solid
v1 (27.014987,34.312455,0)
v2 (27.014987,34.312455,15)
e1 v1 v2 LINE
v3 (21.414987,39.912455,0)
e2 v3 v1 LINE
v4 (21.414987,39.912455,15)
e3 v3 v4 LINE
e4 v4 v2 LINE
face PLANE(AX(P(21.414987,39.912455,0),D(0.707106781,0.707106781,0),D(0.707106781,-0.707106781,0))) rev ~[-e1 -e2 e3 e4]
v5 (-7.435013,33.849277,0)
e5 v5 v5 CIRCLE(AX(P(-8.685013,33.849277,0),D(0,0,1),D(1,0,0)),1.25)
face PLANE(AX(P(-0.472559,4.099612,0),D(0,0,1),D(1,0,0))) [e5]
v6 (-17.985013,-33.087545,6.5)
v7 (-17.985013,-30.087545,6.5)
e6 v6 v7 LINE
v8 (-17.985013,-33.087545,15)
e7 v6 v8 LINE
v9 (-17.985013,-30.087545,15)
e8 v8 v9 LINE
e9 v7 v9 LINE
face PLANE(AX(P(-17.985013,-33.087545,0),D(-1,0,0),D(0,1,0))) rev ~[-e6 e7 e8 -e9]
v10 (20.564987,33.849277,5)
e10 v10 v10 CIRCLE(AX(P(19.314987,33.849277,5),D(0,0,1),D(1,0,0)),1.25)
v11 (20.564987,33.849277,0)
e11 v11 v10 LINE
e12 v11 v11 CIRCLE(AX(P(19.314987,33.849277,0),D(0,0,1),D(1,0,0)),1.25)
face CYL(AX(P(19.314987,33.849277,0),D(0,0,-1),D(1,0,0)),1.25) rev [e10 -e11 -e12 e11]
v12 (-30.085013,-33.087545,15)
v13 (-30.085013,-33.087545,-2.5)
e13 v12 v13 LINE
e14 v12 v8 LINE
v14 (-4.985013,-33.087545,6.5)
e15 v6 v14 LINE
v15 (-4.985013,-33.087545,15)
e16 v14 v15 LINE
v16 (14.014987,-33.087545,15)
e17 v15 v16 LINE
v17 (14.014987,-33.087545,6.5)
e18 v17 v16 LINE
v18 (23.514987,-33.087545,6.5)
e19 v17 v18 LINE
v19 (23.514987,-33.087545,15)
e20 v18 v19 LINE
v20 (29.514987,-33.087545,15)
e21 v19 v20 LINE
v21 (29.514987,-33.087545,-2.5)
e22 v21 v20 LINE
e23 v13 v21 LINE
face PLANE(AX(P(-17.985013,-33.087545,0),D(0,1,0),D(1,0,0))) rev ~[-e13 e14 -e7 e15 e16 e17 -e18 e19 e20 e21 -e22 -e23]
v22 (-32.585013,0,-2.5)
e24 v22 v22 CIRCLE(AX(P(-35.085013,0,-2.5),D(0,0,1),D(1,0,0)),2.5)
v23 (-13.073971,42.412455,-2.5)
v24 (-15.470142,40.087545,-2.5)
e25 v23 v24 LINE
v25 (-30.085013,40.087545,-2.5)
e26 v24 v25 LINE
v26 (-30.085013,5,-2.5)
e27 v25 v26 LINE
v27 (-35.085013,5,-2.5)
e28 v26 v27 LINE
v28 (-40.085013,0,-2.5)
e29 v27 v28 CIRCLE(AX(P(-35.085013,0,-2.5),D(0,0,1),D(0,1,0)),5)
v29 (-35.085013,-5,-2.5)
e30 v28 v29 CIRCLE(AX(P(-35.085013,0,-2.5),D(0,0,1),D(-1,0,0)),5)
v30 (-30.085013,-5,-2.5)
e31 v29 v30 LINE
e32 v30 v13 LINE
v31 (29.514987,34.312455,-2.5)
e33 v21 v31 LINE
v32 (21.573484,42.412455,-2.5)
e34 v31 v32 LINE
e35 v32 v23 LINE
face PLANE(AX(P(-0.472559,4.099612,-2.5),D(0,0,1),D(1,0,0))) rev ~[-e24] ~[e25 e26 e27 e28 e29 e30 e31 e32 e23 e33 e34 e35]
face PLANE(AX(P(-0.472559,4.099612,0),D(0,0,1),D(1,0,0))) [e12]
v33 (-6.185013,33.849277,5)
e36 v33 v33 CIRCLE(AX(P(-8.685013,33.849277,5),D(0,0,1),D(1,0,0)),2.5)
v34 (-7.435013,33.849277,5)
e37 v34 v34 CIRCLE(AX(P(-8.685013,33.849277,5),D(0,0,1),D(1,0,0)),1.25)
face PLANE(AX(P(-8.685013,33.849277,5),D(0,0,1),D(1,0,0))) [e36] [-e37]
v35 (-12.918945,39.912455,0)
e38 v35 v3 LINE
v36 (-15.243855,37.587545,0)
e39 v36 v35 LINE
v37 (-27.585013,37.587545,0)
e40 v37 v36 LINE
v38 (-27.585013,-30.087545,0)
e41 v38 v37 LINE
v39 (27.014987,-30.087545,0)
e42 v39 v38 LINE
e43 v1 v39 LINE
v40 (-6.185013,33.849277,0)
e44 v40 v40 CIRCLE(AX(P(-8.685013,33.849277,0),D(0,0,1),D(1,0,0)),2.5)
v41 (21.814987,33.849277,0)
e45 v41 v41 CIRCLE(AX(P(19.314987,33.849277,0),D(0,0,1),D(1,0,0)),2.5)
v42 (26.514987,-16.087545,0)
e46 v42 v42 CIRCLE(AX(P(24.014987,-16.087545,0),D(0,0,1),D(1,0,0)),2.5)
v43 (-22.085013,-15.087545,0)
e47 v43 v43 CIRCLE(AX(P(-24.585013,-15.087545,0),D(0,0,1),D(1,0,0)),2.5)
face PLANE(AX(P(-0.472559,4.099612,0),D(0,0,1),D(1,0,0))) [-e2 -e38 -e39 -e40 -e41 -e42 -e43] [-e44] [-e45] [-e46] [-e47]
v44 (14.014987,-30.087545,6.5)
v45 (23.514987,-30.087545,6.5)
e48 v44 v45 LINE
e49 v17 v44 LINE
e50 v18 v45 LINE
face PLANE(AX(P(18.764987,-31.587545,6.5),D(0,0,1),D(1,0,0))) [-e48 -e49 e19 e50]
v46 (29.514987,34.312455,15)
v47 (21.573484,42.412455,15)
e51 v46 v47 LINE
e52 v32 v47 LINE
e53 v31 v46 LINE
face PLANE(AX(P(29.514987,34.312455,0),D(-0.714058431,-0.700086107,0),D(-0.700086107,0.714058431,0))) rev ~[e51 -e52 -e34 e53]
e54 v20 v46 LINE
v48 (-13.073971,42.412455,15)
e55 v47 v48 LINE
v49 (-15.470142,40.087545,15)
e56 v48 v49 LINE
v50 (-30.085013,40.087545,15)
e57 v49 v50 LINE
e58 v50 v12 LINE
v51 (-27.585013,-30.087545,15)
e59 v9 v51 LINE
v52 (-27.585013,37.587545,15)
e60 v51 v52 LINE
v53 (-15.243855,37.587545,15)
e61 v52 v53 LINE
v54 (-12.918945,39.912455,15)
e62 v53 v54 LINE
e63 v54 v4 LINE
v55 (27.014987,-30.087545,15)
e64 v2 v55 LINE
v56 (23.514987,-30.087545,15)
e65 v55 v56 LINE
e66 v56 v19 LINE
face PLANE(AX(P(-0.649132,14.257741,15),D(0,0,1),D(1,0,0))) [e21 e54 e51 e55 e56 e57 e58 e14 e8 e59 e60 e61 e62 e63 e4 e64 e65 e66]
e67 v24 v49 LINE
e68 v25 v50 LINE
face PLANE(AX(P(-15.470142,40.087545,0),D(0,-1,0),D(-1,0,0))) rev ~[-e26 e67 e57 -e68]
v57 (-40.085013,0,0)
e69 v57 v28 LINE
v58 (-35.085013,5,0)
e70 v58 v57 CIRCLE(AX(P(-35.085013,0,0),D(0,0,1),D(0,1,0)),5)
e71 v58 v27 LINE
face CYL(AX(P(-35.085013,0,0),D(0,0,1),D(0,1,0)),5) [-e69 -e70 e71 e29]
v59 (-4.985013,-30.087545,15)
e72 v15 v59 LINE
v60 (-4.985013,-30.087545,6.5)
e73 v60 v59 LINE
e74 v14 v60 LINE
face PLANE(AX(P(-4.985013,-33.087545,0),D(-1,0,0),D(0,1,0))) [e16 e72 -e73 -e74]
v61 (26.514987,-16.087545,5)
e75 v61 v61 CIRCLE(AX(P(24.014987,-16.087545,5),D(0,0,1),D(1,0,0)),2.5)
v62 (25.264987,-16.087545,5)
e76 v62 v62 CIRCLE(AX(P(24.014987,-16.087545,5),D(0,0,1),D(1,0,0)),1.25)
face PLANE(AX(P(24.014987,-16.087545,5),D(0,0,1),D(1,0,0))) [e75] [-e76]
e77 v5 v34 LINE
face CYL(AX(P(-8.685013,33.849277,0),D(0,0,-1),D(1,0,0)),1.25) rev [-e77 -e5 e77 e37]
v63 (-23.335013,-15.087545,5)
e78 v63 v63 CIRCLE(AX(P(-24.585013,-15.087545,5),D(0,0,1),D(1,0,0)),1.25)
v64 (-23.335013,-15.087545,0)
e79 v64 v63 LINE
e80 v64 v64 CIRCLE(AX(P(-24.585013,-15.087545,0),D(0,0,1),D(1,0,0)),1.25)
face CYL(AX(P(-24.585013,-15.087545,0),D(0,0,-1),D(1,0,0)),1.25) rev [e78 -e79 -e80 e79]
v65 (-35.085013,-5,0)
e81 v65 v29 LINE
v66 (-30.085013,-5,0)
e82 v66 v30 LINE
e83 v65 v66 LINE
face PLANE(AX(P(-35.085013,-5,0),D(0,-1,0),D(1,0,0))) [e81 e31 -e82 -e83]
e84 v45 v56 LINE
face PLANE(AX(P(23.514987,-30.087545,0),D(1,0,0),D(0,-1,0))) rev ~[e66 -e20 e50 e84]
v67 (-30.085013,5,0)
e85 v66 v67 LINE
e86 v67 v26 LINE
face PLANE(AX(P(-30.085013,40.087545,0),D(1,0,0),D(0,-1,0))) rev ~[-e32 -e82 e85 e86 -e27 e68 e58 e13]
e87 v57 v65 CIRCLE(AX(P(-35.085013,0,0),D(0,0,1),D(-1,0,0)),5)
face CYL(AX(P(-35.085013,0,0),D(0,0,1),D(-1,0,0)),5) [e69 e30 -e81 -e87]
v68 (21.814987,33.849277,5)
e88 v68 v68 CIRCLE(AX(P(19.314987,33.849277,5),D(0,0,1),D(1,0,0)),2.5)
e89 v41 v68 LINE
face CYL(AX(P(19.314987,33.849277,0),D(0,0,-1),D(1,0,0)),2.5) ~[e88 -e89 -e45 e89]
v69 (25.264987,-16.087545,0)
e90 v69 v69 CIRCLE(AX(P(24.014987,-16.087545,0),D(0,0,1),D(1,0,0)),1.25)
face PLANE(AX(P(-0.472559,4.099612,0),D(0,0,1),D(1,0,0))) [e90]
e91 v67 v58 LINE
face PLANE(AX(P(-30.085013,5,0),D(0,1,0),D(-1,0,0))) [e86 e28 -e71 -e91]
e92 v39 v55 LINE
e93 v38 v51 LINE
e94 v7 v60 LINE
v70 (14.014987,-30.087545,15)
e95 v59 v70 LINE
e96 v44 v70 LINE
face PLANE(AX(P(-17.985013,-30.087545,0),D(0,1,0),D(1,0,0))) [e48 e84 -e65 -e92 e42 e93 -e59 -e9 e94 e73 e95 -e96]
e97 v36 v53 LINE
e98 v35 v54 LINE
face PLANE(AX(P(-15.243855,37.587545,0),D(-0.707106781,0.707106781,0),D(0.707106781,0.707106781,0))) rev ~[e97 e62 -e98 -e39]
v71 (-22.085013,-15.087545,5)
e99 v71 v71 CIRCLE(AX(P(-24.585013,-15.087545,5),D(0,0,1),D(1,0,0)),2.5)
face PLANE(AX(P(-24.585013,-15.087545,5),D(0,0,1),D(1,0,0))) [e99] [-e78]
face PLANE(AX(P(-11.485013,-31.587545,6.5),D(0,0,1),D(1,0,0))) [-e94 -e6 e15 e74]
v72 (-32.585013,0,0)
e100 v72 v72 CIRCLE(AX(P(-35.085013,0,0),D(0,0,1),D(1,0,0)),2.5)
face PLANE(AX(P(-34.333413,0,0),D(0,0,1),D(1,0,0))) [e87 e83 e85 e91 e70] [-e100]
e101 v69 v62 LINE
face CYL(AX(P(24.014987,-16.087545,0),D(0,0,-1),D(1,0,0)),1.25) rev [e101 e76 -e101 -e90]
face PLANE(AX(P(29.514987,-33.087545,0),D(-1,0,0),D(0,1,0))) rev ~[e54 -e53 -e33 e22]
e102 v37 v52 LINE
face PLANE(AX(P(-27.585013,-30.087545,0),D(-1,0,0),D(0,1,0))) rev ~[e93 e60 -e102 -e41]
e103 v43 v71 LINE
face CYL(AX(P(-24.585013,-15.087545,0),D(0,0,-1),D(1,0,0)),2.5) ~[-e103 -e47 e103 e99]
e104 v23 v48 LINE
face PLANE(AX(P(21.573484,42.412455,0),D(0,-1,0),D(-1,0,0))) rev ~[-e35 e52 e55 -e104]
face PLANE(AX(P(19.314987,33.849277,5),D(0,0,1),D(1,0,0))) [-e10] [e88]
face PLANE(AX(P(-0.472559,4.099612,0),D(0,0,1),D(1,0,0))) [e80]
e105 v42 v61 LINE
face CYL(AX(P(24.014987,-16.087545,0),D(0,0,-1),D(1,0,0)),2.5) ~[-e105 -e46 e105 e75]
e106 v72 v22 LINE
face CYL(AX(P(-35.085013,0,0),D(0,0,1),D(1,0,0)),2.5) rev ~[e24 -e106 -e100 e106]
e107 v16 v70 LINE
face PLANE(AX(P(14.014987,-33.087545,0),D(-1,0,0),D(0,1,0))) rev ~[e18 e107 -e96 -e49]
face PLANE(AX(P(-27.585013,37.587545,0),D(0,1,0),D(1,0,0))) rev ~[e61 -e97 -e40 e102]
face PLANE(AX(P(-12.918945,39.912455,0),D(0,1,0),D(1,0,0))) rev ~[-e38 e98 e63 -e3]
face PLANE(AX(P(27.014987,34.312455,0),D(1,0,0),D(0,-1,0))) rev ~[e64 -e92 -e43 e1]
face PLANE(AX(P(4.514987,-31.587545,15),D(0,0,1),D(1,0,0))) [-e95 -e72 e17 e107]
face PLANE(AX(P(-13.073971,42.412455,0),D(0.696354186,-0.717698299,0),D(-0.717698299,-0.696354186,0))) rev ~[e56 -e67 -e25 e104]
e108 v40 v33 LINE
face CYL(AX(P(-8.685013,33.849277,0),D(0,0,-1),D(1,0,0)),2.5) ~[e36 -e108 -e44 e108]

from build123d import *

# Parameters (mm, degrees)
F0_R     = 2.5
F0_W     = 19
F0_H     = 3
F0_W_2   = 13
F0_W_3   = 9.5
F0_R_2   = 1.25
F1_DEPTH = 2.5
F2_DEPTH = 15
F3_DEPTH = 6.5
F4_DEPTH = 2.5
F5_DEPTH = 5


# Not quite as in the source:
# - a feature names something its author has since deleted; it is built from what else it names


with BuildPart() as f1:
    # F0 (on Top) → F1 (new body)
    with BuildSketch(Plane.XY):
        Polygon((27.0149873525, -30.0875452161), (27.0149873525, 34.3124547839), (21.4149873525, 39.9124547839), (-12.9189450768, 39.9124547839), (-15.2438546447, 37.5875452161), (-27.5850126475, 37.5875452161), (-27.5850126475, -30.0875452161), (-17.9850126475, -30.0875452161), (-4.9850126475, -30.0875452161), (14.0149873525, -30.0875452161), (23.5149873525, -30.0875452161), align=None)
        with Locations((-24.5850126475, -15.0875452161)):
            Circle(F0_R, mode=Mode.SUBTRACT)
        with Locations((24.0149873525, -16.0875452161)):
            Circle(F0_R, mode=Mode.SUBTRACT)
        with Locations((-8.6850126475, 33.8492766023)):
            Circle(F0_R, mode=Mode.SUBTRACT)
        with Locations((19.3149873525, 33.8492766023)):
            Circle(F0_R, mode=Mode.SUBTRACT)
        Polygon((21.4149873525, 39.9124547839), (27.0149873525, 34.3124547839), (27.0149873525, -30.0875452161), (29.5149873525, -30.0875452161), (29.5149873525, 34.3124547839), (21.5734839439, 42.4124547839), (-13.0739709929, 42.4124547839), (-15.4701419023, 40.0875452161), (-30.0850126475, 40.0875452161), (-30.0850126475, 10), (-30.0850126475, 5), (-30.0850126475, 0), (-30.0850126475, -5), (-30.0850126475, -30.0875452161), (-27.5850126475, -30.0875452161), (-27.5850126475, 37.5875452161), (-15.2438546447, 37.5875452161), (-12.9189450768, 39.9124547839), align=None)
        with Locations((4.5149873525, -31.5875452161)):
            Rectangle(F0_W, F0_H)
        with Locations((-11.4850126475, -31.5875452161)):
            Rectangle(F0_W_2, F0_H)
        Polygon((-17.9850126475, -33.0875452161), (-17.9850126475, -30.0875452161), (-27.5850126475, -30.0875452161), (-30.0850126475, -30.0875452161), (-30.0850126475, -33.0875452161), align=None)
        with Locations((18.7649873525, -31.5875452161)):
            Rectangle(F0_W_3, F0_H)
        with Locations((19.3149873525, 33.8492766023)):
            Circle(F0_R)
        with Locations((19.3149873525, 33.8492766023)):
            Circle(F0_R_2, mode=Mode.SUBTRACT)
        with Locations((-24.5850126475, -15.0875452161)):
            Circle(F0_R)
        with Locations((-24.5850126475, -15.0875452161)):
            Circle(F0_R_2, mode=Mode.SUBTRACT)
        with Locations((24.0149873525, -16.0875452161)):
            Circle(F0_R)
        with Locations((24.0149873525, -16.0875452161)):
            Circle(F0_R_2, mode=Mode.SUBTRACT)
        with Locations((-8.6850126475, 33.8492766023)):
            Circle(F0_R)
        with Locations((-8.6850126475, 33.8492766023)):
            Circle(F0_R_2, mode=Mode.SUBTRACT)
        Polygon((29.5149873525, -30.0875452161), (27.0149873525, -30.0875452161), (23.5149873525, -30.0875452161), (23.5149873525, -33.0875452161), (29.5149873525, -33.0875452161), align=None)
        with Locations((-24.5850126475, -15.0875452161)):
            Circle(F0_R_2)
        with Locations((24.0149873525, -16.0875452161)):
            Circle(F0_R_2)
        with Locations((-8.6850126475, 33.8492766023)):
            Circle(F0_R_2)
        with Locations((19.3149873525, 33.8492766023)):
            Circle(F0_R_2)
    extrude(amount=-F1_DEPTH)

    # F0 (on Top) → F2 (join)
    with BuildSketch(Plane.XY):
        Polygon((21.4149873525, 39.9124547839), (27.0149873525, 34.3124547839), (27.0149873525, -30.0875452161), (29.5149873525, -30.0875452161), (29.5149873525, 34.3124547839), (21.5734839439, 42.4124547839), (-13.0739709929, 42.4124547839), (-15.4701419023, 40.0875452161), (-30.0850126475, 40.0875452161), (-30.0850126475, 10), (-30.0850126475, 5), (-30.0850126475, 0), (-30.0850126475, -5), (-30.0850126475, -30.0875452161), (-27.5850126475, -30.0875452161), (-27.5850126475, 37.5875452161), (-15.2438546447, 37.5875452161), (-12.9189450768, 39.9124547839), align=None)
        Polygon((-17.9850126475, -33.0875452161), (-17.9850126475, -30.0875452161), (-27.5850126475, -30.0875452161), (-30.0850126475, -30.0875452161), (-30.0850126475, -33.0875452161), align=None)
        with Locations((4.5149873525, -31.5875452161)):
            Rectangle(F0_W, F0_H)
        Polygon((29.5149873525, -30.0875452161), (27.0149873525, -30.0875452161), (23.5149873525, -30.0875452161), (23.5149873525, -33.0875452161), (29.5149873525, -33.0875452161), align=None)
    extrude(amount=F2_DEPTH)

    # F0 (on Top) → F3 (join)
    with BuildSketch(Plane.XY):
        with Locations((-11.4850126475, -31.5875452161)):
            Rectangle(F0_W_2, F0_H)
        with Locations((18.7649873525, -31.5875452161)):
            Rectangle(F0_W_3, F0_H)
    extrude(amount=F3_DEPTH)

    # F0 (on Top) → F4 (join)
    with BuildSketch(Plane.XY):
        with BuildLine():
            Line((-35.0850126475, -5), (-30.0850126475, -5))
            Line((-30.0850126475, -5), (-30.0850126475, 0))
            Line((-30.0850126475, 0), (-30.0850126475, 5))
            Line((-30.0850126475, 5), (-35.0850126475, 5))
            ThreePointArc((-35.0850126475, 5), (-38.6205465534, 3.5355339059), (-40.0850126475, 0))
            ThreePointArc((-40.0850126475, 0), (-38.6205465534, -3.5355339059), (-35.0850126475, -5))
        make_face()
        with Locations((-35.0850126475, 0)):
            Circle(F0_R, mode=Mode.SUBTRACT)
    extrude(amount=-F4_DEPTH)

    # F0 (on Top) → F5 (join)
    with BuildSketch(Plane.XY):
        with Locations((-24.5850126475, -15.0875452161)):
            Circle(F0_R)
        with Locations((-24.5850126475, -15.0875452161)):
            Circle(F0_R_2, mode=Mode.SUBTRACT)
        with Locations((-8.6850126475, 33.8492766023)):
            Circle(F0_R)
        with Locations((-8.6850126475, 33.8492766023)):
            Circle(F0_R_2, mode=Mode.SUBTRACT)
        with Locations((19.3149873525, 33.8492766023)):
            Circle(F0_R)
        with Locations((19.3149873525, 33.8492766023)):
            Circle(F0_R_2, mode=Mode.SUBTRACT)
        with Locations((24.0149873525, -16.0875452161)):
            Circle(F0_R)
        with Locations((24.0149873525, -16.0875452161)):
            Circle(F0_R_2, mode=Mode.SUBTRACT)
    extrude(amount=F5_DEPTH)


solid = f1.part
